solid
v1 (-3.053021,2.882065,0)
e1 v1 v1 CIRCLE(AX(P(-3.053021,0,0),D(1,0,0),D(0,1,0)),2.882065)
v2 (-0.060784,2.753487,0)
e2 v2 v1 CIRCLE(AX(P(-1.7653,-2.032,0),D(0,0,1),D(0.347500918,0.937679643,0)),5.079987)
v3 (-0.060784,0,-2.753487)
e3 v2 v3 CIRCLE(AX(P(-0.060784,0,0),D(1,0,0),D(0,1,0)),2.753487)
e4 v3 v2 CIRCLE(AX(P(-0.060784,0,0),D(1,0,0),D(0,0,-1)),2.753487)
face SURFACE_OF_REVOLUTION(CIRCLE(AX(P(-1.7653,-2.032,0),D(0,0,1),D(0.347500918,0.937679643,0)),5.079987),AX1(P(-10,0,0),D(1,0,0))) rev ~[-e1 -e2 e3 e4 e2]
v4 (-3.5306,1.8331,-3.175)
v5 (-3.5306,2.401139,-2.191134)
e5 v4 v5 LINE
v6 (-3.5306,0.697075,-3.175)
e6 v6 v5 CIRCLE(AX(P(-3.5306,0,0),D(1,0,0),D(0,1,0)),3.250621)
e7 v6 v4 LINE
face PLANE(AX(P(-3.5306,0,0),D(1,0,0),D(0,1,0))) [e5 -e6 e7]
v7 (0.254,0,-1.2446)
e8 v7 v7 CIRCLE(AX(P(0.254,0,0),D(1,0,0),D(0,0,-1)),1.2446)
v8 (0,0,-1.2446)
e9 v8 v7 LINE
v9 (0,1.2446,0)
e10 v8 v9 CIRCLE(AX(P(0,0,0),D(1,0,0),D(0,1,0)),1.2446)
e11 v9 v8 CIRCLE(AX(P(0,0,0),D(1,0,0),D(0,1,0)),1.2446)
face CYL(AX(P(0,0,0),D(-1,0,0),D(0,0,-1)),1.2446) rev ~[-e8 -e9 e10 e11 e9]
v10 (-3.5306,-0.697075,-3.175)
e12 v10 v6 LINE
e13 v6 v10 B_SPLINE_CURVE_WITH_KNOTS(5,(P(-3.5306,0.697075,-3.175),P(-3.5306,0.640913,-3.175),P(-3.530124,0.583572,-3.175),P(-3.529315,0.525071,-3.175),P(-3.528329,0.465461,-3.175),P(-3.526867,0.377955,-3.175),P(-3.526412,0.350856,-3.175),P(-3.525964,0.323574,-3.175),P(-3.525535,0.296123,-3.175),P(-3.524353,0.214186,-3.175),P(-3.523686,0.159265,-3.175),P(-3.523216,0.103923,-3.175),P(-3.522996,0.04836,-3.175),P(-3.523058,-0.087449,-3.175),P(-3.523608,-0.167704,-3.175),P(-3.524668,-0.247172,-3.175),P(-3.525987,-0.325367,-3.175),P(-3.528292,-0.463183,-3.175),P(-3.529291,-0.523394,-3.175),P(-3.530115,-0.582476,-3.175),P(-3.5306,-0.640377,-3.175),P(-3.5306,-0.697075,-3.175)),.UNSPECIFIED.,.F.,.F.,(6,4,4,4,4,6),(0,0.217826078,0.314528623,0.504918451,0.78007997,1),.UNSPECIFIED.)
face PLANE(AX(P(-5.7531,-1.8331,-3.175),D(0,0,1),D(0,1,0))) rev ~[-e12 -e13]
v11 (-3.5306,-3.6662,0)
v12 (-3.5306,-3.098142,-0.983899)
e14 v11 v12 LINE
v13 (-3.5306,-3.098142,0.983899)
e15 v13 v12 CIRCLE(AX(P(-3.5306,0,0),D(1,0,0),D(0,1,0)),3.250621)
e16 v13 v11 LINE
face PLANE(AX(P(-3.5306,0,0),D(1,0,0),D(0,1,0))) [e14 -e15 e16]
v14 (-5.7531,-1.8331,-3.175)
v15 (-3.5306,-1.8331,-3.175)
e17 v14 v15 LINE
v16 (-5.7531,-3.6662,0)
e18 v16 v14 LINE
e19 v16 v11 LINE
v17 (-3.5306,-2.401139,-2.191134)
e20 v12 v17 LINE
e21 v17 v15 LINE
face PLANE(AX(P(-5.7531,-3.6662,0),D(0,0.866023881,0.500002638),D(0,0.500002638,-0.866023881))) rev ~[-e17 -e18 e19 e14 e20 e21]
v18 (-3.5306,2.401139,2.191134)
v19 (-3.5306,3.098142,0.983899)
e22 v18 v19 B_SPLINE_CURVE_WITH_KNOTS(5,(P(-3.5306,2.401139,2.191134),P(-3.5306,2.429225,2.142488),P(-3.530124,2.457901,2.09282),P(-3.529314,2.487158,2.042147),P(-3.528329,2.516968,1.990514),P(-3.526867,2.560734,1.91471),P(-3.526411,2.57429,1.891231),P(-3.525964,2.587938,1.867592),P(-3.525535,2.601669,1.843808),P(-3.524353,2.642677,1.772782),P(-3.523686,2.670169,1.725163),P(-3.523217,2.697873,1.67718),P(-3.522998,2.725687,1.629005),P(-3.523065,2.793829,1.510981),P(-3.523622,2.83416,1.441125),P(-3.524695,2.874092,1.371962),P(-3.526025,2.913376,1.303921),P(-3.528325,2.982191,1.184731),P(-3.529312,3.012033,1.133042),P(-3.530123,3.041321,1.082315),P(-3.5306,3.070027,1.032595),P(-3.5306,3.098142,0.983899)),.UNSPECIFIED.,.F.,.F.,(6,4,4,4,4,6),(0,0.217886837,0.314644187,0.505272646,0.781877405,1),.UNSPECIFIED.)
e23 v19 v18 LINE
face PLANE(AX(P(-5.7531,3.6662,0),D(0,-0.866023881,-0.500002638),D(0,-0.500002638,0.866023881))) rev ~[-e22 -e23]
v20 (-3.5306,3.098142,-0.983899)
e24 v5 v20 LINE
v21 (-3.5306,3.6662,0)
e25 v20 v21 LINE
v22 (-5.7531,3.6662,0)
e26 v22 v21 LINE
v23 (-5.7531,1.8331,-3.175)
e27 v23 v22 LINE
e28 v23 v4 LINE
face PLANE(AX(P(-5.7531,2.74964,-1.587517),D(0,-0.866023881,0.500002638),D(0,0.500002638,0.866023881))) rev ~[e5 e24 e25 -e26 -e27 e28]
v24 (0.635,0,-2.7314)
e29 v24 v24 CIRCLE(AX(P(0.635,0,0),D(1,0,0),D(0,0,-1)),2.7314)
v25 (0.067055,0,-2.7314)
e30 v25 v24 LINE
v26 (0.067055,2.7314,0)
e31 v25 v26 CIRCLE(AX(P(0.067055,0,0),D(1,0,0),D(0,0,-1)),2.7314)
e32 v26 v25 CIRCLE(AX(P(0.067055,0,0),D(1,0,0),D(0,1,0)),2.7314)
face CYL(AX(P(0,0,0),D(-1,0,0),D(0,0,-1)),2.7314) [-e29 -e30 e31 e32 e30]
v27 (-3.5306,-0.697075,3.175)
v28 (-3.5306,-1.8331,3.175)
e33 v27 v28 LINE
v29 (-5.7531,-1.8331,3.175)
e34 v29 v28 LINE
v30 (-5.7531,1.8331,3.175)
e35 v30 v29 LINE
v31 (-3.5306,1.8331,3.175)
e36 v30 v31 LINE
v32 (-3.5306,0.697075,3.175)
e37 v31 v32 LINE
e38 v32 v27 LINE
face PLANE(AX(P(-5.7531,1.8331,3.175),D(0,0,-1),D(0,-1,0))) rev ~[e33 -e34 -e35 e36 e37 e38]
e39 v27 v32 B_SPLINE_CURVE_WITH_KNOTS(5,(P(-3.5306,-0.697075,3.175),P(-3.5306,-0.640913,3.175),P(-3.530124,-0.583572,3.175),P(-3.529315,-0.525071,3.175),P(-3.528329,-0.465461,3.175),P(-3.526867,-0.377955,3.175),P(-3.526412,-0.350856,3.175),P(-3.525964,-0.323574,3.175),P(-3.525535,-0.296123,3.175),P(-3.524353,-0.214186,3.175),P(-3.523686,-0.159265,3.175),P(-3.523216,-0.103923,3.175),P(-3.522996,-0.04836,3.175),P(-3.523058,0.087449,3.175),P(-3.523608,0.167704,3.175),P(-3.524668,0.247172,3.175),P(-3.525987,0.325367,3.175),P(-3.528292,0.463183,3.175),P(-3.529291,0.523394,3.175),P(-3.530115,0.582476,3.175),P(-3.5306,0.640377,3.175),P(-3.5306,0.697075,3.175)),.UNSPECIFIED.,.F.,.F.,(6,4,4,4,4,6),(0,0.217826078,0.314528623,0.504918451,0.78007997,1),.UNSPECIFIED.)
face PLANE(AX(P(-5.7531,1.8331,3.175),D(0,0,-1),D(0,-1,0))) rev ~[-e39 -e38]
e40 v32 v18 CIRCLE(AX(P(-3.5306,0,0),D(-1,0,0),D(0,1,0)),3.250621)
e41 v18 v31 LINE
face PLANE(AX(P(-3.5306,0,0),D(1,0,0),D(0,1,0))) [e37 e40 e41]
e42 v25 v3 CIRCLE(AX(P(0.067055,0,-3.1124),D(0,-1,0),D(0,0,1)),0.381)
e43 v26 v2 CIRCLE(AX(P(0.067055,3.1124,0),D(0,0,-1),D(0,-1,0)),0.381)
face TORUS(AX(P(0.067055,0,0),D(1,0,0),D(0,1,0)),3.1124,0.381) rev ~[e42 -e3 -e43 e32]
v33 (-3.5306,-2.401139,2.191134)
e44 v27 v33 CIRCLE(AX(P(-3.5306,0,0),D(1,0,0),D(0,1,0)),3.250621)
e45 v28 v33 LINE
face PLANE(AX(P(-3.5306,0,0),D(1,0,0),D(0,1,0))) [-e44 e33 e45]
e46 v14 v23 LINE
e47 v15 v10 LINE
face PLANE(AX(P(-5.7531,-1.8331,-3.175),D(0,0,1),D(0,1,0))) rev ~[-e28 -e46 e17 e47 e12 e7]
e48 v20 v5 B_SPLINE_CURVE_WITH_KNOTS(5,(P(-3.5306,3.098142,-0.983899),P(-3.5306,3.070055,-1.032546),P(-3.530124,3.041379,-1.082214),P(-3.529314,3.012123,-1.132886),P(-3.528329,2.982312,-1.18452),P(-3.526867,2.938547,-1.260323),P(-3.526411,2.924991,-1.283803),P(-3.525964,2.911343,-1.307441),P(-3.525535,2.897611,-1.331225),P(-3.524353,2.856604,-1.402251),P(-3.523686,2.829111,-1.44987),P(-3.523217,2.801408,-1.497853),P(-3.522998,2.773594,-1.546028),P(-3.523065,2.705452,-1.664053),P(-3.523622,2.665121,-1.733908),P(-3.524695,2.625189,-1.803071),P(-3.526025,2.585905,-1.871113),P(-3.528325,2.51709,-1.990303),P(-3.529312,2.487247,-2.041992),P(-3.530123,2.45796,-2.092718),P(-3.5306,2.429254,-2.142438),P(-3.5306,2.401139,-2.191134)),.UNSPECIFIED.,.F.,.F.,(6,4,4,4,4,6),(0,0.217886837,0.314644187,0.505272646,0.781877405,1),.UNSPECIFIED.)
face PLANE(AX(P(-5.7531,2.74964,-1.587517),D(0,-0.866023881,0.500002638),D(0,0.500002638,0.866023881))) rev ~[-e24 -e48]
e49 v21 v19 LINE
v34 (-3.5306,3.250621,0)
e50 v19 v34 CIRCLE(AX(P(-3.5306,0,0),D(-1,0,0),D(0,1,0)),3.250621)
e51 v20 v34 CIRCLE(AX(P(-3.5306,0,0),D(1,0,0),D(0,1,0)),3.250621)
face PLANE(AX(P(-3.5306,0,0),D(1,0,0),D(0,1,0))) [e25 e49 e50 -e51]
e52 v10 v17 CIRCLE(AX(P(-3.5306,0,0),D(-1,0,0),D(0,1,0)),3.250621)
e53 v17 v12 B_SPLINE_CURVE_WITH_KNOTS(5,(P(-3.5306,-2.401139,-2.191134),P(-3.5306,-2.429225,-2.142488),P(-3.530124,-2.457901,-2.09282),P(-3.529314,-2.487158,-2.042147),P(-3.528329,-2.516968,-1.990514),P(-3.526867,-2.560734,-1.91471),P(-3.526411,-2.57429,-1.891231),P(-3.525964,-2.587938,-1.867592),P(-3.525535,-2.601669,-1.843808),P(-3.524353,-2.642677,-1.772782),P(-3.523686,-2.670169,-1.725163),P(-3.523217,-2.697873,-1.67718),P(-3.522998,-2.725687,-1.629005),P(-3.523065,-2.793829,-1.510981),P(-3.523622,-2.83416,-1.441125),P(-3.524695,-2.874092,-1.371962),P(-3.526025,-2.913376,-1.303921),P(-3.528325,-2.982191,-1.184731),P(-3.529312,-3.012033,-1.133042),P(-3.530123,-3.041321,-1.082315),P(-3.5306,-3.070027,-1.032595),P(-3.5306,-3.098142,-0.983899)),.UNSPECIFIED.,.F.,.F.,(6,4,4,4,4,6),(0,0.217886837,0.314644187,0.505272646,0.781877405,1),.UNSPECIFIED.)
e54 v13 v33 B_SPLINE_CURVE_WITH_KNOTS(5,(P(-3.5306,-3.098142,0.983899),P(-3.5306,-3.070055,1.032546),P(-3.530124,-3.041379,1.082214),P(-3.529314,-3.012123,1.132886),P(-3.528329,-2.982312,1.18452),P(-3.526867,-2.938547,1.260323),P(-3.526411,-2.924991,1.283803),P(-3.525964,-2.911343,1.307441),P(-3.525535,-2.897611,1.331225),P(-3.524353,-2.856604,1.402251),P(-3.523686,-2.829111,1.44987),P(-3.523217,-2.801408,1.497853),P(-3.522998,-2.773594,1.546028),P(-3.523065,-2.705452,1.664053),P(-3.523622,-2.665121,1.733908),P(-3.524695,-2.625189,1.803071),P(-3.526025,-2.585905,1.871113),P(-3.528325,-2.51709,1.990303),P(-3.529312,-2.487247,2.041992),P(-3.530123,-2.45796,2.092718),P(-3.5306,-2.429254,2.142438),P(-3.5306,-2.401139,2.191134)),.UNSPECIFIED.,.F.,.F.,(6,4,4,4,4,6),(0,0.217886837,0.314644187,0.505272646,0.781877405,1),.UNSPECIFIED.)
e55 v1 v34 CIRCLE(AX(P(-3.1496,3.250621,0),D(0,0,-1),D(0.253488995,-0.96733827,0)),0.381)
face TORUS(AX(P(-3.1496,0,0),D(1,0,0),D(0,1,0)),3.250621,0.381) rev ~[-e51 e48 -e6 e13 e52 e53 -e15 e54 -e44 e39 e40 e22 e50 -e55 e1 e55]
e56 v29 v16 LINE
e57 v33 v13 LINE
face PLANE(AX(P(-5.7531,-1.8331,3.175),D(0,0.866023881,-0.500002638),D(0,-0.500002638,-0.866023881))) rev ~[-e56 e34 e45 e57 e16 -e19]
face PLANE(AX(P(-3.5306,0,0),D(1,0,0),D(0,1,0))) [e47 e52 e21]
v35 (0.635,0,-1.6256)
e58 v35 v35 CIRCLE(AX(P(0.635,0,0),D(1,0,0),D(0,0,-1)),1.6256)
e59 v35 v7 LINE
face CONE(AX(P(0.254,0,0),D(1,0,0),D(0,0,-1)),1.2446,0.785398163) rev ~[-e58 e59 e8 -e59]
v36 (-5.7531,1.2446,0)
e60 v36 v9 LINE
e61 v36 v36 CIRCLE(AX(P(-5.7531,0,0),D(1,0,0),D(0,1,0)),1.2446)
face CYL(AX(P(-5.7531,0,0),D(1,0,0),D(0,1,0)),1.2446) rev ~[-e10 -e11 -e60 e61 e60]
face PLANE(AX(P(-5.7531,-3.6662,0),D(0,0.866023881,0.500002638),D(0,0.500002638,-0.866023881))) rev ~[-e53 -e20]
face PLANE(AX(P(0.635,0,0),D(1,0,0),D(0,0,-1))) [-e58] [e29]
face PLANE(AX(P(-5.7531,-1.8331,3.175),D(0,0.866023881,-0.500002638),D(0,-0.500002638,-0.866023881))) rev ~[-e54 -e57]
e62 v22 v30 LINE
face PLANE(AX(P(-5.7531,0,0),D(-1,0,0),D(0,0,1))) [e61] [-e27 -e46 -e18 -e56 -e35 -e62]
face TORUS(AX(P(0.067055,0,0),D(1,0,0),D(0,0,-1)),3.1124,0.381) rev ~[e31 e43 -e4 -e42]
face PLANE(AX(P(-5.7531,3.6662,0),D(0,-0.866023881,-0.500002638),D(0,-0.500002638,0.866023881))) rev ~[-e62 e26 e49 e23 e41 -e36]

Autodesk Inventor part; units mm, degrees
ref_plane "YZ Plane" through (0, 0, 0) normal (1, 0, 0) x (0, 1, 0)
ref_plane "XZ Plane" through (0, 0, 0) normal (0, 1, 0) x (-1, 0, 0)
ref_plane "XY Plane" through (0, 0, 0) normal (0, 0, 1) x (1, 0, 0)
sketch "Sketch1" plane through (0, 0, 0) normal (0, 0, 1) x (1, 0, 0)
  line L0 (-6.9037, 0) -> (1.1506, 0) projected
  line L1 (0, -3.0734) -> (0, 4.2164) construction
  line L2 (-3.5306, 3.175) -> (-5.7531, 3.175)
  line L3 (-5.7531, 3.175) -> (-5.7531, 1.2446)
  line L4 (-5.7531, 1.2446) -> (0, 1.2446)
  line L5 (0, 1.2446) -> (0, 2.7314)
  line L6 (-3.5306, 3.175) -> (-3.5306, 2.7314)
  arc A0 (0, 2.7314) -> (-3.5306, 2.7314) centre (-1.7653, -2.032) ccw
  point P0 (0, 0)
  dimension "d0" = 6.35
  dimension "d1" = 5.08
  dimension "d2" = 3.9878
  dimension "d3" = 2.2225
  dimension "d5" = 2.4892
  dimension "d6" = 5.4628
revolve "Revolution1" add sketch "Sketch1" angle 360 about axis through (-10, 0, 0) along (1, 0, 0)
sketch "Sketch2" plane through (-5.7531, 0, 0) normal (-1, 0, 0) x (0, 0, 1)
  circle A0 centre (0, 0) radius 3.175 projected
  line L0 (3.175, -1.8331) -> (0, -3.6662)
  line L1 (0, -3.6662) -> (-3.175, -1.8331)
  line L2 (-3.175, -1.8331) -> (-3.175, 1.8331)
  line L3 (-3.175, 1.8331) -> (0, 3.6662)
  line L4 (0, 3.6662) -> (3.175, 1.8331)
  line L5 (3.175, 1.8331) -> (3.175, -1.8331)
  point P0 (3.175, 0)
extrude "Extrusion1" add sketch "Sketch2" against normal up to surface (2.2225 mm away) contours L5 L0 A0 | A0 L4 L5 | A0 L3 L4 | L0 L1 A0 | A0 L2 L3 | L1 L2 A0
sketch "Sketch3" plane through (0, 0, 0) normal (1, 0, 0) x (0, 0, -1)
  circle A0 centre (0, 0) radius 2.7314 projected
  circle A1 centre (0, 0) radius 1.2446 projected
extrude "Extrusion2" add sketch "Sketch3" along normal blind 0.635
fillet "Fillet1" radius 0.381 3 edges at (-3.5306, -2.7314, 0) (0, 1.9314, -1.9314) (0, -1.9314, 1.9314)
chamfer "Chamfer1" distance 0.381 angle 45 1 edges at (0.635, 0, 1.2446)
properties part number "Shock Bushing"
